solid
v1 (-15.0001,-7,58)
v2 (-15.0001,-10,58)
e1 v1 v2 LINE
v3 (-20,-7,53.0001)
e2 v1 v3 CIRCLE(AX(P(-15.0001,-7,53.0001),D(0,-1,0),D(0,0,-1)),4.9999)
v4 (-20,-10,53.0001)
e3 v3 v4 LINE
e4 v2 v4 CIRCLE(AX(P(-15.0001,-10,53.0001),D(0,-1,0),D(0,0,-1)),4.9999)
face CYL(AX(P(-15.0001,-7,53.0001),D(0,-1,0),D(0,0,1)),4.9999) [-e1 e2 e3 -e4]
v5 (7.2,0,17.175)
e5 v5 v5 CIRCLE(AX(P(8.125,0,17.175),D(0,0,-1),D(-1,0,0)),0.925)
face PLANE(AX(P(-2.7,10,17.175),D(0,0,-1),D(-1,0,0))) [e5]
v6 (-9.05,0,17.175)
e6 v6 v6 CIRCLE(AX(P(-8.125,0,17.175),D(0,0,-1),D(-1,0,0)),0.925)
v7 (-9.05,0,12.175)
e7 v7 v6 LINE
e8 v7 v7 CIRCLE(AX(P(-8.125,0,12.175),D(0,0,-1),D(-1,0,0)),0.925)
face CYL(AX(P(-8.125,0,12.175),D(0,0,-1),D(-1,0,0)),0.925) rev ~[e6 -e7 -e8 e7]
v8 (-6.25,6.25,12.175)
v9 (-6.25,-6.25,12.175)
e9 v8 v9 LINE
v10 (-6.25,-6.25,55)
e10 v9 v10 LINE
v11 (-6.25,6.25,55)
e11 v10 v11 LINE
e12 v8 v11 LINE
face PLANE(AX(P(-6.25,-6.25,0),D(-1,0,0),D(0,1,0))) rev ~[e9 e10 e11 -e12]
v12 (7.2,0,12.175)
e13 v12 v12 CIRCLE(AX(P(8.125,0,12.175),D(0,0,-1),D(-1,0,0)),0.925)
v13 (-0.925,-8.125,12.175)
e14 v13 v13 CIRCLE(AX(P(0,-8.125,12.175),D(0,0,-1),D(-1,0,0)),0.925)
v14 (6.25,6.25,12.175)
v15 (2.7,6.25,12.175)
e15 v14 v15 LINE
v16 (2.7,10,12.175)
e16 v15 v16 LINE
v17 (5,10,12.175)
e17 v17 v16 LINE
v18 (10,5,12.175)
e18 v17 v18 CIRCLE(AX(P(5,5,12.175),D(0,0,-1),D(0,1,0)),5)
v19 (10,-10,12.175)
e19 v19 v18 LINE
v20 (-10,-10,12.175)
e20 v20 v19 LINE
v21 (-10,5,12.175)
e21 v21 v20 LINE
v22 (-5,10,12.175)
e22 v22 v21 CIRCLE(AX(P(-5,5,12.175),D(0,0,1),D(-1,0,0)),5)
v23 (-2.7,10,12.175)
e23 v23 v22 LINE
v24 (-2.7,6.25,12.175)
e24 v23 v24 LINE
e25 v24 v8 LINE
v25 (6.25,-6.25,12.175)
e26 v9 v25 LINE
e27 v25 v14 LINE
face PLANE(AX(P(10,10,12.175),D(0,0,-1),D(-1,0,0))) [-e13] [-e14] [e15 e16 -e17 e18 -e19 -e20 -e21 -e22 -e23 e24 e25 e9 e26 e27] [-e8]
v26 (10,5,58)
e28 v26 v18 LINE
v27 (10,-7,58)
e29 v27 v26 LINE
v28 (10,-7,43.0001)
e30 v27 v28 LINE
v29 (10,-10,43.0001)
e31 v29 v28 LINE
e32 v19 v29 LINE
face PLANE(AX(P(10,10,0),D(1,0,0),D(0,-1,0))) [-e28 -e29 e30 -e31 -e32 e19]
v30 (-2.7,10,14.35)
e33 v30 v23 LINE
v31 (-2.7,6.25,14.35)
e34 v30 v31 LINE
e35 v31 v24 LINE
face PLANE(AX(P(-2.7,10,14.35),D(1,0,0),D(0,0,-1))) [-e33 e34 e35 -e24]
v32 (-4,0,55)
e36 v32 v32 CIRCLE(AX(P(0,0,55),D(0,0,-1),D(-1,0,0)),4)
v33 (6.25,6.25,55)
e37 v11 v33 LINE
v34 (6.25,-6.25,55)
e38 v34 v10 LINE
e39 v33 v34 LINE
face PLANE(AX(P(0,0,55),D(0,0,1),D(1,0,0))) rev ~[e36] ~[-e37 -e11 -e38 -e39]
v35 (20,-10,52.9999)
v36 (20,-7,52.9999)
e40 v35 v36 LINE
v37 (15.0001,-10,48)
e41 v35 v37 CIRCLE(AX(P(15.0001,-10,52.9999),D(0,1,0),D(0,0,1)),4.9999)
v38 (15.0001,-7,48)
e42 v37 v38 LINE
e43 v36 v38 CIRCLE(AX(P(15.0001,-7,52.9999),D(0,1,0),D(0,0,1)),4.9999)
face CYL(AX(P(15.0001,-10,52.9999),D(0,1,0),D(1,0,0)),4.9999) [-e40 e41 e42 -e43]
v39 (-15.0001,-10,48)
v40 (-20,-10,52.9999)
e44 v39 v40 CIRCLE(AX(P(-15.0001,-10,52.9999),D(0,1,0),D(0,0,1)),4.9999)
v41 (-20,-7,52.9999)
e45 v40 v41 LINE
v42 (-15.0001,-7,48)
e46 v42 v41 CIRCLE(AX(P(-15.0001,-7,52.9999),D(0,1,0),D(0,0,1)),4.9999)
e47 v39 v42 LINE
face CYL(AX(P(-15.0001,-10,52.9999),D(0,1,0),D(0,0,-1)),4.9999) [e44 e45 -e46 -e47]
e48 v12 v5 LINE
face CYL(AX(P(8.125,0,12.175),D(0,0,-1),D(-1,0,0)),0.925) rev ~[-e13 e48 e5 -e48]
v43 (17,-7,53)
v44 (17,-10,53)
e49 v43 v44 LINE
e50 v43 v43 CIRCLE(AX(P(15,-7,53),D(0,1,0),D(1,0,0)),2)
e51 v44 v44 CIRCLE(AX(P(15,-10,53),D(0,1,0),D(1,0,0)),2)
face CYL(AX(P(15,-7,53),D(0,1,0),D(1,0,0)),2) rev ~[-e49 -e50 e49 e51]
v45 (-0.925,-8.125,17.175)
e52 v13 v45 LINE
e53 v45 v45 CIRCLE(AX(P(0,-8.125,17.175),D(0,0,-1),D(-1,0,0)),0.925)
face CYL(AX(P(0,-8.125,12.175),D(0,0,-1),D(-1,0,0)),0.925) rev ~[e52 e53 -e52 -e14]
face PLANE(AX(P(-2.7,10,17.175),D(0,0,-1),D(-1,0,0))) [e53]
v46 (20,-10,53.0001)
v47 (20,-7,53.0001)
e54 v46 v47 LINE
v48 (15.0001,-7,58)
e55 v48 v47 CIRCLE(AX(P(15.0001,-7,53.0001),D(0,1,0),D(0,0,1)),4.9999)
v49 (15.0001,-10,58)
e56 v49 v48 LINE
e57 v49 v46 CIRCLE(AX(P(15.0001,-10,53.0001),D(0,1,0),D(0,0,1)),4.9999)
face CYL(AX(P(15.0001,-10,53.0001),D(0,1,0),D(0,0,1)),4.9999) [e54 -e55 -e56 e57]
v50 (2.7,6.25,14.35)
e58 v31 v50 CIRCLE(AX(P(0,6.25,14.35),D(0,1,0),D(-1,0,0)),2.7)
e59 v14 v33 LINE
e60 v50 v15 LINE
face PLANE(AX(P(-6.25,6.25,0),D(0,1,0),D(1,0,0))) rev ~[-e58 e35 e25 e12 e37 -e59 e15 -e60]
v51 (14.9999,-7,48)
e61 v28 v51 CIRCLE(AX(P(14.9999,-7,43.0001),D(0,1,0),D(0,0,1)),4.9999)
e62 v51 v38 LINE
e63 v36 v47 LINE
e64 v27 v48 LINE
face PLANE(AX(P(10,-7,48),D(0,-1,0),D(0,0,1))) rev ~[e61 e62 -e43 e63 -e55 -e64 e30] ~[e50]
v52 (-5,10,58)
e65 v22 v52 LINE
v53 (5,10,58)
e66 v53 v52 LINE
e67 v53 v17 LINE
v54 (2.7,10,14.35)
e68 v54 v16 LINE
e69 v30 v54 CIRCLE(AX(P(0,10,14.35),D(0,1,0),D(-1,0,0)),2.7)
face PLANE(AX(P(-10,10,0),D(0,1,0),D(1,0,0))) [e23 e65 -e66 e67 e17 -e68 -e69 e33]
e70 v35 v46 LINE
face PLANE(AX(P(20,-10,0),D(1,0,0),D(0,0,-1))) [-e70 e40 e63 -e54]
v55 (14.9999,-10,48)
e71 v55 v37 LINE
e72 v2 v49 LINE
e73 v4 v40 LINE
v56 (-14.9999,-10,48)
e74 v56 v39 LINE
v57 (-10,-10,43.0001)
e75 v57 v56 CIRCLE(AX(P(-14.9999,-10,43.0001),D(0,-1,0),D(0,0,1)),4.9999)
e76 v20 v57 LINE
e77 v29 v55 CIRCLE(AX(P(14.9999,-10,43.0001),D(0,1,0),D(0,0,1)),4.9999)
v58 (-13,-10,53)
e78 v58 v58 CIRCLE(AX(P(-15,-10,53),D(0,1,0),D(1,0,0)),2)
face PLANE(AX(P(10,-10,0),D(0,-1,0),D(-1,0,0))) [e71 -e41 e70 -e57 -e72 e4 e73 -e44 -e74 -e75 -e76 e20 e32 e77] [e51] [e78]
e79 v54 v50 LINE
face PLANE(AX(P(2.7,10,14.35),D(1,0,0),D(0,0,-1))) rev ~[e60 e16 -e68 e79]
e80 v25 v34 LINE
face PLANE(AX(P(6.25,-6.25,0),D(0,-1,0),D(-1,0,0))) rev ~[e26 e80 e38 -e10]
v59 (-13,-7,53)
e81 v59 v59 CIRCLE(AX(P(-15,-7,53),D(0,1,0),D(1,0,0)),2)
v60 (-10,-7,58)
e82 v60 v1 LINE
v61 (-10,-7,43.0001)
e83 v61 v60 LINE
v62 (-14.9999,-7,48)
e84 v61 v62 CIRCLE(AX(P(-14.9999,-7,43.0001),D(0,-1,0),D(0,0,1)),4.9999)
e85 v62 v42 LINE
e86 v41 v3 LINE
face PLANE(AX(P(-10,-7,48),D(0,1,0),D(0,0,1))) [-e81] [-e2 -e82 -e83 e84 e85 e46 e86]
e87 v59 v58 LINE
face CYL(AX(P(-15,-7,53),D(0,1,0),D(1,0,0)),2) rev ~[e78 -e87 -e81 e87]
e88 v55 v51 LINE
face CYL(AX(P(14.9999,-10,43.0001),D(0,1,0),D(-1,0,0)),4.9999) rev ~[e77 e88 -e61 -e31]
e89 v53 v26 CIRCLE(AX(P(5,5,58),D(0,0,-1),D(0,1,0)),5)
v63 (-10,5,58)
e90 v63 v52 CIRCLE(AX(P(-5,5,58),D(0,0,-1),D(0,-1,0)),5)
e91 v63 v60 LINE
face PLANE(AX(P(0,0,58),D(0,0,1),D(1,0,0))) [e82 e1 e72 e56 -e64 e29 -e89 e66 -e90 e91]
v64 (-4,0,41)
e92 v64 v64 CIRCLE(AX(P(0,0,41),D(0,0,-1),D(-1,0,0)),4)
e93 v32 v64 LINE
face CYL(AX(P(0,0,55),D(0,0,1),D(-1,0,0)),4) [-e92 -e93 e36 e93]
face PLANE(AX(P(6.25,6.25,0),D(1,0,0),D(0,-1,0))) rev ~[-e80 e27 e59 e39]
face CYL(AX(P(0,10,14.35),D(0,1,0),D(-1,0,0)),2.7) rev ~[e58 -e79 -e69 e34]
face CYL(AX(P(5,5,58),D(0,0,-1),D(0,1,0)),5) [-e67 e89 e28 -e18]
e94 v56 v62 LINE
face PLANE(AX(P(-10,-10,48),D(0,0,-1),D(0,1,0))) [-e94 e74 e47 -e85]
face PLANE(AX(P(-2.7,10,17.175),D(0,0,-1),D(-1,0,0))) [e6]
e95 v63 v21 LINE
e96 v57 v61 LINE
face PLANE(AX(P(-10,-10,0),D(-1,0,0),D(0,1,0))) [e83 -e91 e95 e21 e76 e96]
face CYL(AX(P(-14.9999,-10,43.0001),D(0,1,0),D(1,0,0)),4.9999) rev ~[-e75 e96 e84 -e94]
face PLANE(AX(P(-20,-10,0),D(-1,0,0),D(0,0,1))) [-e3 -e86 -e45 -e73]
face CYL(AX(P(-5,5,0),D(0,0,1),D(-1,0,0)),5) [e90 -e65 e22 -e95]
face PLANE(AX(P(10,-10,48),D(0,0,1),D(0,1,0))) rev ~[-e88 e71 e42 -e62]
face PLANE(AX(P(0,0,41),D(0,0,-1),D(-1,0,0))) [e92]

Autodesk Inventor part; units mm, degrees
ref_plane "YZ Plane" through (0, 0, 0) normal (1, 0, 0) x (0, 1, 0)
ref_plane "XZ Plane" through (0, 0, 0) normal (0, 1, 0) x (-1, 0, 0)
ref_plane "XY Plane" through (0, 0, 0) normal (0, 0, 1) x (1, 0, 0)
sketch "Sketch1" plane through (0, 0, 0) normal (0, 0, 1) x (1, 0, 0)
  line L0 (-6.25, 6.25) -> (6.25, 6.25)
  line L1 (6.25, 6.25) -> (6.25, -6.25)
  line L2 (6.25, -6.25) -> (-6.25, -6.25)
  line L3 (-6.25, -6.25) -> (-6.25, 6.25)
  line L4 (-10, 10) -> (10, 10)
  line L5 (10, 10) -> (10, -10)
  line L6 (10, -10) -> (-10, -10)
  line L7 (-10, -10) -> (-10, 10)
  line L8 (-10, 10) -> (10, -10) construction
  line L9 (10, 10) -> (-10, -10) construction
  dimension "d3" = 20
  dimension "d4" = 20
  dimension "d5" = 3.75
  dimension "d6" = 16.25
  dimension "d7" = 3.75
  dimension "d8" = 16.25
extrude "Extrusion1" add sketch "Sketch1" along normal blind 55
sketch "Sketch2" plane through (0, 0, 55) normal (0, 0, 1) x (1, 0, 0)
  line L0 (10, 10) -> (-10, 10) projected
  line L1 (-10, -10) -> (10, -10)
  line L2 (10, -10) -> (10, 10)
  line L3 (10, 10) -> (-10, 10)
  line L4 (-10, 10) -> (-10, -10)
  line L5 (-10, -10) -> (10, 10) construction
  line L6 (10, -10) -> (-10, 10) construction
  point P0 (0, 0)
extrude "Extrusion2" add sketch "Sketch2" along normal blind 3
sketch "Sketch3" plane through (0, 0, 55) normal (0, 0, -1) x (-1, 0, 0)
  circle A0 centre (0, 0) radius 4
  dimension "d13" = 8
extrude "Extrusion3" add sketch "Sketch3" along normal blind 14
sketch "Sketch4" plane through (10, -10, 0) normal (1, 0, 0) x (0, 0, -1)
  line L0 (0, 0) -> (-58, 0) projected
  line L1 (0, 0) -> (-10, 0)
  line L2 (-10, 0) -> (-10, 3)
  line L3 (-10, 3) -> (0, 3)
  line L4 (0, 3) -> (0, 0)
  line L5 (-58, 0) -> (-58, 20) projected
  line L6 (-58, 0) -> (-48, 0)
  line L7 (-48, 0) -> (-48, 3)
  line L8 (-48, 3) -> (-58, 3)
  line L9 (-58, 3) -> (-58, 0)
  point P0 (0, 10)
  dimension "d16" = 10
  dimension "d17" = 3
  dimension "d18" = 10
  dimension "d19" = 3
extrude "Extrusion4" add sketch "Sketch4" along normal blind 10
sketch "Sketch5" plane through (-10, -10, 0) normal (-1, 0, 0) x (0, 0, 1)
  line L0 (0, 0) -> (0, 20) projected
  line L1 (0, 3) -> (10, 3) projected
  line L2 (0, 0) -> (10, 0)
  line L3 (10, 0) -> (10, 3)
  line L4 (10, 3) -> (0, 3)
  line L5 (0, 3) -> (0, 0)
  line L6 (58, 20) -> (58, 0) projected
  line L7 (58, 0) -> (48, 0)
  line L8 (48, 0) -> (48, 3)
  line L9 (48, 3) -> (58, 3)
  line L10 (58, 3) -> (58, 0)
  point P0 (0, 10)
  dimension "d22" = 10
  dimension "d23" = 3
  dimension "d24" = 10
  dimension "d25" = 3
extrude "Extrusion5" add sketch "Sketch5" along normal blind 10
fillet "Fillet1" radius 5 12 edges at (-20, -8.5, 10) (-20, -8.5, 0) (-10, -8.5, 10) (-10, -8.5, 48) (-20, -8.5, 48) (-20, -8.5, 58) (20, -8.5, 0) (10, -8.5, 10) (20, -8.5, 10) (10, -8.5, 48) (20, -8.5, 48) (20, -8.5, 58)
sketch "Sketch6" plane through (10, -7, 15) normal (0, 1, 0) x (1, 0, 0)
  arc A0 (-25, 15) -> (-25, 5) centre (-25, 10) ccw projected
  circle A1 centre (-25, 10) radius 2
  arc A2 (5, 5) -> (5, 15) centre (5, 10) ccw projected
  circle A3 centre (5, 10) radius 2
  arc A4 (-25, -33) -> (-25, -43) centre (-25, -38) ccw projected
  circle A5 centre (-25, -38) radius 2
  arc A6 (5, -43) -> (5, -33) centre (5, -38) ccw projected
  circle A7 centre (5, -38) radius 2
  point P0 (-10, 15)
  dimension "d29" = 4
  dimension "d30" = 4
  dimension "d31" = 4
extrude "Extrusion6" cut sketch "Sketch6" against normal blind 10
fillet "Fillet2" radius 5 2 edges at (-10, 10, 29) (10, 10, 29)
sketch "Sketch7" plane through (-5, 10, 0) normal (0, 1, 0) x (1, 0, 0)
  arc A0 (7.7, -10) -> (2.3, -10) centre (5, -10) ccw
  line L0 (0, -58) -> (0, 0) projected
  arc A1 (2.3, -14.35) -> (7.7, -14.35) centre (5, -14.35) ccw
  line L1 (2.3, -14.35) -> (2.3, -10)
  line L2 (7.7, -14.35) -> (7.7, -10)
  point P0 (5, 0)
  dimension "d35" = 5.4
  dimension "d36" = 5
  dimension "d37" = 10
  dimension "d38" = 5.4
  dimension "d39" = 4.35
  dimension "d40" = 5
extrude "Extrusion7" cut sketch "Sketch7" against normal blind 10
sketch "Sketch8" plane through (-5, 10, 0) normal (0, 1, 0) x (1, 0, 0)
  line L0 (2.3, -10) -> (2.3, -14.35) projected
  line L1 (2.3, -12.175) -> (-5, -12.175)
  line L2 (-5, 0) -> (-5, -58) projected
  arc A0 (-5, -15) -> (-10, -10) centre (-10, -15) ccw projected
  line L3 (-5, -12.175) -> (-5, -15)
  line L4 (-5, -15) -> (-18.139, -15)
  line L5 (-18.139, -15) -> (-18.139, 3.699)
  line L6 (-18.139, 3.699) -> (27.6458, 3.699)
  line L7 (27.6458, 3.699) -> (27.6458, -15)
  line L8 (15, -15) -> (15, -43) projected
  line L9 (27.6458, -15) -> (15, -15)
  line L10 (15, -15) -> (15, -12.175)
  arc A1 (20, -10) -> (15, -15) centre (20, -15) ccw projected
  line L11 (15, -12.175) -> (2.3, -12.175)
  point P0 (5, 0)
  dimension "d43" = 12.6458
  dimension "d44" = 33.139
  dimension "d45" = 18.699
extrude "Extrusion8" cut sketch "Sketch8" against normal blind 20
sketch "Sketch9" plane through (-2.7, 10, 12.175) normal (0, 0, -1) x (-1, 0, 0)
  circle A0 centre (-10.825, -10) radius 0.925
  circle A1 centre (-2.7, -18.125) radius 0.925
  circle A2 centre (5.425, -10) radius 0.925
  line L0 (-12.7, -20) -> (-12.7, -5) projected
  line L1 (7.3, -20) -> (-12.7, -20) projected
  line L2 (3.55, -16.25) -> (3.55, -3.75) projected
  point P0 (-2.7, -10)
  dimension "d48" = 1.85
  dimension "d49" = 1.85
  dimension "d50" = 1.85
  dimension "d51" = 1.875
  dimension "d52" = 1.875
  dimension "d53" = 1.875
  dimension "d54" = 0
  dimension "d55" = 0
  dimension "d56" = 0
extrude "Extrusion9" cut sketch "Sketch9" against normal blind 5
properties part number "14 slot pinhuls groot"
